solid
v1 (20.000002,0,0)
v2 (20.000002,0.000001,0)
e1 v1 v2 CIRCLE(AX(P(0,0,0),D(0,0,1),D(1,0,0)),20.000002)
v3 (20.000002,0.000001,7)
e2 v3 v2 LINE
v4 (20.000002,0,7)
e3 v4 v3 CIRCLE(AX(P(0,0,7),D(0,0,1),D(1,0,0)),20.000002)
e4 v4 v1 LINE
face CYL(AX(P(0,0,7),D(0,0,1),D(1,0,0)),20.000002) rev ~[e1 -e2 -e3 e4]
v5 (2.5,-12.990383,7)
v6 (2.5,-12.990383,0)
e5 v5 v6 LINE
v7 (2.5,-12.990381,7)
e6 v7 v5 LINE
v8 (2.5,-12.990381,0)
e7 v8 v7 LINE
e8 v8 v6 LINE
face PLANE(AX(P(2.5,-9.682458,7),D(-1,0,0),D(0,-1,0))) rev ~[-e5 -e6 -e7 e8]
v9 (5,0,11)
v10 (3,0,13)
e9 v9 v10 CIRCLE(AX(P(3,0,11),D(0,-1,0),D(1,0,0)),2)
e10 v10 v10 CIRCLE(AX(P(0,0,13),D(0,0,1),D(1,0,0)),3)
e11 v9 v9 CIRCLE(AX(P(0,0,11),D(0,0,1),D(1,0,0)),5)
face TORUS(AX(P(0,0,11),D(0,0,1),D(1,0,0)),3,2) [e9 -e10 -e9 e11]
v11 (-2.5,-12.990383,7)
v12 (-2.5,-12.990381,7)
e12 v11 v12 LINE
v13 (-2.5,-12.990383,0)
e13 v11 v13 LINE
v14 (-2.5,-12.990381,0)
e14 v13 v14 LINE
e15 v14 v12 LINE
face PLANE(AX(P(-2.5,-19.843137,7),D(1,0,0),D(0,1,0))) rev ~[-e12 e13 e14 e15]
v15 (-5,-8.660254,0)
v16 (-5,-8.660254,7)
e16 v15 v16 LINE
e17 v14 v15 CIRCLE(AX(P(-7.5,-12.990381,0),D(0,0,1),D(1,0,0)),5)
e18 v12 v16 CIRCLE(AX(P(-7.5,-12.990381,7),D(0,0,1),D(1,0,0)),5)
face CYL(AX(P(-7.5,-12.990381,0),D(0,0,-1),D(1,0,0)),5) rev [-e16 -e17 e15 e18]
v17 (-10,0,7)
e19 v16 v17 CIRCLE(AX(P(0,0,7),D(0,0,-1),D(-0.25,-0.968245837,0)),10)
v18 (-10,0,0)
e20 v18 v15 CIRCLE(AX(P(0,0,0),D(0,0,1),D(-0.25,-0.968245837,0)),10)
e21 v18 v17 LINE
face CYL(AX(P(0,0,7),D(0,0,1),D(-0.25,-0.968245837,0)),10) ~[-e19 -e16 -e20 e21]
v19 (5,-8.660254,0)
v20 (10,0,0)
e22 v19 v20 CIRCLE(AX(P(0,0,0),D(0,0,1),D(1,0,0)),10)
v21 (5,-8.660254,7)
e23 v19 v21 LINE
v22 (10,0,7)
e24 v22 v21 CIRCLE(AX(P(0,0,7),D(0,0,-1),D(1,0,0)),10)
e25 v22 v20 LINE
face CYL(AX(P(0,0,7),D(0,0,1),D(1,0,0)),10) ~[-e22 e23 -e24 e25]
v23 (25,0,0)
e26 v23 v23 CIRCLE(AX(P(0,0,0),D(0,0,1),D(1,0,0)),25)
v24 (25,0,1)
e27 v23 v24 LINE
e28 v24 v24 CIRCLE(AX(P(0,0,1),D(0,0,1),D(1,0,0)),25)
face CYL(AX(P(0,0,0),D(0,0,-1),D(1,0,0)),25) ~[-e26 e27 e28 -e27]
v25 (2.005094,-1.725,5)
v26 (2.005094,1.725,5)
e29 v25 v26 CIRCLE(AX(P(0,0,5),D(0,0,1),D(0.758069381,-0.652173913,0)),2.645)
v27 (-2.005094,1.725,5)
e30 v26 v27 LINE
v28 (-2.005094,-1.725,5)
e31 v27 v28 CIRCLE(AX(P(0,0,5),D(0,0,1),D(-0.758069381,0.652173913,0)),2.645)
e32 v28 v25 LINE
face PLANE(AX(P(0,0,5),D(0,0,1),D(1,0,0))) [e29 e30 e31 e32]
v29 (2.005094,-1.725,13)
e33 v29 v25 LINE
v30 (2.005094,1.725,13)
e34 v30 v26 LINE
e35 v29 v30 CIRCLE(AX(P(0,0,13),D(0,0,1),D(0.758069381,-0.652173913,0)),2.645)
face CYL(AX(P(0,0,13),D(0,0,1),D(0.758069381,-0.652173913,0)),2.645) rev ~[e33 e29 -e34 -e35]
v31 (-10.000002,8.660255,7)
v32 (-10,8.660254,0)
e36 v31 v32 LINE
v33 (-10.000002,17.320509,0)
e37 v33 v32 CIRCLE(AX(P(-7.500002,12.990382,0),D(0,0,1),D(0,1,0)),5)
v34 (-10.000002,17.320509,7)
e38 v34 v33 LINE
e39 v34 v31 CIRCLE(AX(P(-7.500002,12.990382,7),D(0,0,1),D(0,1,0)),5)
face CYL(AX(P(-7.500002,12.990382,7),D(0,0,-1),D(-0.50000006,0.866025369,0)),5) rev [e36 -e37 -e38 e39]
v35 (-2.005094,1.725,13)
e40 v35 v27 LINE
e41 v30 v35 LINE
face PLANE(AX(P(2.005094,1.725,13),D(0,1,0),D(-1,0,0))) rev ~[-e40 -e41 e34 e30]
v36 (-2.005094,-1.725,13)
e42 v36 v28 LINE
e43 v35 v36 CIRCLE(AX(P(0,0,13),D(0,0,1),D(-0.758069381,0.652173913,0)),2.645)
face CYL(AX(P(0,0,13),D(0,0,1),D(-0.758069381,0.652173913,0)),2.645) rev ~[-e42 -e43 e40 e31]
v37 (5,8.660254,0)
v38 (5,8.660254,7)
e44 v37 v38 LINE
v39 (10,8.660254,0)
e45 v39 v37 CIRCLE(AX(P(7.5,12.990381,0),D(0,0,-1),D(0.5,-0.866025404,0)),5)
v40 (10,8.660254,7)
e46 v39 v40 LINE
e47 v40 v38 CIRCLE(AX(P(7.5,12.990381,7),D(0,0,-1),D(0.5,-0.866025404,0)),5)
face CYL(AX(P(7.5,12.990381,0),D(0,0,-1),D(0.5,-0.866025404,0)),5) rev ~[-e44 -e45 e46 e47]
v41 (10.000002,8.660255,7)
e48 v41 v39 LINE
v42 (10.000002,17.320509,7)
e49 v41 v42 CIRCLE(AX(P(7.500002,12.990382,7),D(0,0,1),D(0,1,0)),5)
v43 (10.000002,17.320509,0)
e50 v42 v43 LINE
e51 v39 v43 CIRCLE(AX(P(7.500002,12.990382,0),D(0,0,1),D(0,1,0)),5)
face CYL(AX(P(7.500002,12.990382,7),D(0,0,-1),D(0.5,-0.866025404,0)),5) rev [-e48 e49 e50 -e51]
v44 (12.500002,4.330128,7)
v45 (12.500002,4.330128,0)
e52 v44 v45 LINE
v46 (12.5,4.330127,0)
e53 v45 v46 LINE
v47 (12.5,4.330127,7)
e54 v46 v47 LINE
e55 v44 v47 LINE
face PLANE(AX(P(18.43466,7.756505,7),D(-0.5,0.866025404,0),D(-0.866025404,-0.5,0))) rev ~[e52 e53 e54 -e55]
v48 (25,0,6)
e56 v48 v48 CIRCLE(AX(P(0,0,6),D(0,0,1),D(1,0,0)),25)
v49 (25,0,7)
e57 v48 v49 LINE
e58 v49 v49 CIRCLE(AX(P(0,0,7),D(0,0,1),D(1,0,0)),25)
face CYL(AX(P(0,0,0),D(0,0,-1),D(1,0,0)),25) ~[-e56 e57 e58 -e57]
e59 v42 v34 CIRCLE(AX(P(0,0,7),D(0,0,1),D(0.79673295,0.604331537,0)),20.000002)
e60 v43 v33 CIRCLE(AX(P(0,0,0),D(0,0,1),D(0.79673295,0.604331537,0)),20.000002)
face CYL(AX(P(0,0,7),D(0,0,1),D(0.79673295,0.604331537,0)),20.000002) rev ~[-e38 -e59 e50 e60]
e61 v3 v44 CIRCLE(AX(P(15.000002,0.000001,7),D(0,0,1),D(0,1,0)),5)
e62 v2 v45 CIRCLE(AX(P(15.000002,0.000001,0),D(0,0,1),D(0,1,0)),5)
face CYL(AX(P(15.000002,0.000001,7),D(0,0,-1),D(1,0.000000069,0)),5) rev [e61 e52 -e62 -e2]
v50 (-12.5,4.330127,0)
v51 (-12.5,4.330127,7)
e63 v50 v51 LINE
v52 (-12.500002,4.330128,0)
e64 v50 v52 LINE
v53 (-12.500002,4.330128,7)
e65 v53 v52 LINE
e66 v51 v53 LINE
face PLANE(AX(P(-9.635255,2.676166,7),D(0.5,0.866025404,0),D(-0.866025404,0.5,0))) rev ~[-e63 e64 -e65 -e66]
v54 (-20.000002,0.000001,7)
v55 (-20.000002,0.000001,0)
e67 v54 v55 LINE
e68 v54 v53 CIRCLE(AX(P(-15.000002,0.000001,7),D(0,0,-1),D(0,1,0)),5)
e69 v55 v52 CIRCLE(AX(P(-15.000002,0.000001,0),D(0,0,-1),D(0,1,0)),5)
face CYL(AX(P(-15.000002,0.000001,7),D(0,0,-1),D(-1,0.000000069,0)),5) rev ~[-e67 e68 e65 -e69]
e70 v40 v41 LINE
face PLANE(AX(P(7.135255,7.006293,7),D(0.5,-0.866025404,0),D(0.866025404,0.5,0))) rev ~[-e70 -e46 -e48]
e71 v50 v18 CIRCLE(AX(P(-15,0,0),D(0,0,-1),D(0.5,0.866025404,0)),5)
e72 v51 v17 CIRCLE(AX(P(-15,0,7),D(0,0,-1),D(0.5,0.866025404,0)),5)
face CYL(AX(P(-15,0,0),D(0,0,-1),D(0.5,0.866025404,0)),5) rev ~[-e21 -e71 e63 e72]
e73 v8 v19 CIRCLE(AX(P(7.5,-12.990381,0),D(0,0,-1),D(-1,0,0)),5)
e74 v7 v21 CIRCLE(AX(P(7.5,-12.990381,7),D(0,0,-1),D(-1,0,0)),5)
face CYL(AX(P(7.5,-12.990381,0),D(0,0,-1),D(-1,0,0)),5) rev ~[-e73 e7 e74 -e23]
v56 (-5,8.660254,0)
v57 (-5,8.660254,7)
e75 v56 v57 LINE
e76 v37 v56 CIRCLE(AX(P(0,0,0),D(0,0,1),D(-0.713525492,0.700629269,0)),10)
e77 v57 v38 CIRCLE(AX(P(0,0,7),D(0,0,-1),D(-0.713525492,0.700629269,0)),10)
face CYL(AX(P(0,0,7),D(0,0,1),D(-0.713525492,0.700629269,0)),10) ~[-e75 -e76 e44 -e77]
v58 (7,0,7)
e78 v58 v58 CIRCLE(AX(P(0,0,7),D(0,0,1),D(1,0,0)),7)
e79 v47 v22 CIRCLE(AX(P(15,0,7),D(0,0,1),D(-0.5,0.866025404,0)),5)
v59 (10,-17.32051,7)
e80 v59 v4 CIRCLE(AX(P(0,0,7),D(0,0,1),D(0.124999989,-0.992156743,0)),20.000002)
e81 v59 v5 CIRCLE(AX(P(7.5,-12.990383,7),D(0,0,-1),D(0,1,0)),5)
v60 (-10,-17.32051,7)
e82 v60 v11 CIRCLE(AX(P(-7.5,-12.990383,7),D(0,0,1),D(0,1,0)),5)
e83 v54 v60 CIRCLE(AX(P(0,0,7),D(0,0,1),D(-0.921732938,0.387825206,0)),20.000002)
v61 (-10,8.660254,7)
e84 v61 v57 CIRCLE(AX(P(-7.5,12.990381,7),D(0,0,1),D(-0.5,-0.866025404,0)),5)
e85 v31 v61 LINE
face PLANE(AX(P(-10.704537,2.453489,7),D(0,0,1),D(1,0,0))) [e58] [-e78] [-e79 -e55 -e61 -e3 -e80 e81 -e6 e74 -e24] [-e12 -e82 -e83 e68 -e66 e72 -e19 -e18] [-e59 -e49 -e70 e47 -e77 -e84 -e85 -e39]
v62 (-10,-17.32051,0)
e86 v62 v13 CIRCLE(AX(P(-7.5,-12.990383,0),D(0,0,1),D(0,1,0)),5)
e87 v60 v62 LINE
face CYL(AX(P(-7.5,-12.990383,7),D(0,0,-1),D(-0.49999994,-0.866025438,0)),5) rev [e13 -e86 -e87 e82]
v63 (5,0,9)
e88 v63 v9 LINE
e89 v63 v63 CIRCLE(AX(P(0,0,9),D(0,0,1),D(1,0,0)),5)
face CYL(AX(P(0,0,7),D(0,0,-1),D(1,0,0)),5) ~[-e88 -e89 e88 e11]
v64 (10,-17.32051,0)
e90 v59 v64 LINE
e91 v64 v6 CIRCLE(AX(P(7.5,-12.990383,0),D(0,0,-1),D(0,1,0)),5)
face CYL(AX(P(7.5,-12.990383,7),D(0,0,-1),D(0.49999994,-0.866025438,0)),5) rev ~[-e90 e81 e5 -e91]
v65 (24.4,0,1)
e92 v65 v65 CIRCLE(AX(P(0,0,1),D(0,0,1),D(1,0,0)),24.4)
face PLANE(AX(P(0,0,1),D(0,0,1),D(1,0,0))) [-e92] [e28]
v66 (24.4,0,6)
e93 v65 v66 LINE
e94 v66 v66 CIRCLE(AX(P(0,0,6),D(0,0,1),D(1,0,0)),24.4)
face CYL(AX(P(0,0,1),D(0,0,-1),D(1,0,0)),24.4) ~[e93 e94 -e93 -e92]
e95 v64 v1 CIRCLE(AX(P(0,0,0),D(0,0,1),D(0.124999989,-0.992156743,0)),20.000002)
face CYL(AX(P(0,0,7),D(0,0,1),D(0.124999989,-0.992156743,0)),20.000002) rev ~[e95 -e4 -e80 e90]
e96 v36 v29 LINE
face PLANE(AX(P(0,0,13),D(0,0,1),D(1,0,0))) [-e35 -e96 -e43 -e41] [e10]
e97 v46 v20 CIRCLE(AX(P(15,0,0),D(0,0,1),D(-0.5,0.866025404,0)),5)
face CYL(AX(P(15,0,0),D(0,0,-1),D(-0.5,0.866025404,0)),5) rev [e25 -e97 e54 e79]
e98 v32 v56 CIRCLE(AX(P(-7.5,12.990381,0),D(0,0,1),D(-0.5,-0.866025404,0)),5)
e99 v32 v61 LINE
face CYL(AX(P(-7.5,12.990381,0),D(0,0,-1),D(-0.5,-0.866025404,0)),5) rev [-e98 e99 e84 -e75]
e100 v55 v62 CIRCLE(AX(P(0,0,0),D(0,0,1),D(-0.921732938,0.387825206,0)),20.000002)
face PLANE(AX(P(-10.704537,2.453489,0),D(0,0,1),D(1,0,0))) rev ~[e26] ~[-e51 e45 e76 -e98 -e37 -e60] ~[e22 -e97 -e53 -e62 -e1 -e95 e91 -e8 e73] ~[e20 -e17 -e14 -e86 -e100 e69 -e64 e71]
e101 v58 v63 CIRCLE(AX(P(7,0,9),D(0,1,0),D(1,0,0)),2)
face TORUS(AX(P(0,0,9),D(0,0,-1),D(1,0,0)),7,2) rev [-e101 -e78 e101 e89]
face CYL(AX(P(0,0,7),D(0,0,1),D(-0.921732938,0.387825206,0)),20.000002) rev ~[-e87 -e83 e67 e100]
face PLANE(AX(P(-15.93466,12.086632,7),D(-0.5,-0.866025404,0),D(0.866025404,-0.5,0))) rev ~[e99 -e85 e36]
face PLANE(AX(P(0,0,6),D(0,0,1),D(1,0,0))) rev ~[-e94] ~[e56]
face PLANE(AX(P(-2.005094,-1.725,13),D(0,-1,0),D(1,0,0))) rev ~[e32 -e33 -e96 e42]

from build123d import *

# Parameters (mm, degrees)
F0_R         = 25
F1_DEPTH     = 7
F2_R         = 5
F3_DEPTH     = 6
F5_DEPTH     = 8
F7_R         = 25
F7_R_2       = 24.4
F8_DEPTH     = 5
F10_DEPTH    = 25
F11_R        = 5
F12_T1_DEPTH = 7
F13_R        = 2


# Not quite as in the source:
# - a fillet or chamfer that OpenCascade refuses, or shapes differently, is made with other operations: its cross-section is extruded or revolved along the edge and cut away or added


with BuildPart() as f1:
    # F0 (on Top) → F1 (new body)
    with BuildSketch(Plane.XY):
        Circle(F0_R)
    extrude(amount=F1_DEPTH)

    # F2 (on face) → F3 (join)
    with BuildSketch(Plane.XY.offset(7)):
        Circle(F2_R)
    extrude(amount=F3_DEPTH)

    # F4 (on face) → F5 (cut)
    with BuildSketch(Plane.XY.offset(13)):
        with BuildLine():
            Line((2.005093514, 1.725), (-2.005093514, 1.725))
            ThreePointArc((-2.005093514, 1.725), (-2.645, 0), (-2.005093514, -1.725))
            Line((-2.005093514, -1.725), (2.005093514, -1.725))
            ThreePointArc((2.005093514, -1.725), (2.645, 0), (2.005093514, 1.725))
        make_face()
    extrude(amount=-F5_DEPTH, mode=Mode.SUBTRACT)

    # F7 (on offset) → F8 (cut)
    with BuildSketch(Plane.XY.offset(1)):
        Circle(F7_R)
        Circle(F7_R_2, mode=Mode.SUBTRACT)
    extrude(amount=F8_DEPTH, mode=Mode.SUBTRACT)

    # F9 (on face) → F10 (cut)
    with BuildSketch(Plane.XY.offset(7)):
        with BuildLine():
            Line((7.1352549156, 7.0062926922), (15.9346604169, 12.0866318271))
            ThreePointArc((15.9346604169, 12.0866318271), (0, 20.0000017881), (-15.9346604169, 12.0866318271))
            Line((-15.9346604169, 12.0866318271), (-7.1352549156, 7.0062926922))
            ThreePointArc((-7.1352549156, 7.0062926922), (0, 10), (7.1352549156, 7.0062926922))
        make_face()
        with BuildLine():
            ThreePointArc((2.5, -19.8431366353), (15.0000012666, -13.2287578225), (20.0000017881, 0))
            ThreePointArc((20.0000017881, 0), (19.6047610649, 3.9564397015), (18.4346604169, 7.7565048082))
            Line((18.4346604169, 7.7565048082), (9.6352549156, 2.6761656733))
            ThreePointArc((9.6352549156, 2.6761656733), (9.9083941473, 1.3504537837), (10, 0))
            ThreePointArc((10, 0), (7.9056941504, -6.123724357), (2.5, -9.6824583655))
            Line((2.5, -9.6824583655), (2.5, -19.8431366353))
        make_face()
        with BuildLine():
            ThreePointArc((-18.4346604169, 7.7565048082), (-17.3205096243, -10.0000008941), (-2.5, -19.8431366353))
            Line((-2.5, -19.8431366353), (-2.5, -9.6824583655))
            ThreePointArc((-2.5, -9.6824583655), (-8.6602540378, -5), (-9.6352549156, 2.6761656733))
            Line((-9.6352549156, 2.6761656733), (-18.4346604169, 7.7565048082))
        make_face()
    extrude(amount=-F10_DEPTH, mode=Mode.SUBTRACT)

    # F11
    f11_edges = [f1.edges().sort_by_distance(p)[0] for p in [
        (-18.43466, 7.756505, 3.5),
        (-15.93466, 12.086632, 3.5),
        (15.93466, 12.086632, 3.5),
        (18.43466, 7.756505, 3.5),
        (2.5, -19.843137, 3.5),
        (-2.5, -19.843137, 3.5),
    ]]
    fillet(f11_edges, radius=F11_R)

    # F12: fillet of radius 5 on 6 edges, made by hand

    # F12_s2 → F12_t1 (join)
    with BuildSketch(Plane.XY):
        with BuildLine():
            ThreePointArc((-12.5, 4.3301270189), (-10.6698729811, 2.5), (-10, 0))
            ThreePointArc((-10, 0), (-9.9083941473, 1.3504537837), (-9.6352549156, 2.6761656733))
            Line((-9.6352549156, 2.6761656733), (-12.5, 4.3301270189))
        make_face()
        with BuildLine():
            ThreePointArc((-2.5, -12.9903810568), (-3.1698729811, -10.4903810568), (-5, -8.6602540378))
            ThreePointArc((-5, -8.6602540378), (-3.7846697903, -9.2561479341), (-2.5, -9.6824583655))
            Line((-2.5, -9.6824583655), (-2.5, -12.9903810568))
        make_face()
        with BuildLine():
            ThreePointArc((2.5, -12.9903810568), (3.1698729811, -10.4903810568), (5, -8.6602540378))
            ThreePointArc((5, -8.6602540378), (3.7846697903, -9.2561479341), (2.5, -9.6824583655))
            Line((2.5, -9.6824583655), (2.5, -12.9903810568))
        make_face()
        with BuildLine():
            ThreePointArc((12.5, 4.3301270189), (10.6698729811, 2.5), (10, 0))
            ThreePointArc((10, 0), (9.9083941473, 1.3504537837), (9.6352549156, 2.6761656733))
            Line((9.6352549156, 2.6761656733), (12.5, 4.3301270189))
        make_face()
        with BuildLine():
            ThreePointArc((10, 8.6602540378), (7.5, 7.9903810568), (5, 8.6602540378))
            ThreePointArc((5, 8.6602540378), (6.123724357, 7.9056941504), (7.1352549156, 7.0062926922))
            Line((7.1352549156, 7.0062926922), (10, 8.6602540378))
        make_face()
        with BuildLine():
            ThreePointArc((-10, 8.6602540378), (-7.5, 7.9903810568), (-5, 8.6602540378))
            ThreePointArc((-5, 8.6602540378), (-6.123724357, 7.9056941504), (-7.1352549156, 7.0062926922))
            Line((-7.1352549156, 7.0062926922), (-10, 8.6602540378))
        make_face()
    extrude(amount=F12_T1_DEPTH)

    # F13
    f13_edges = [f1.edges().sort_by_distance(p)[0] for p in [
        (-5, 0, 7),
        (-5, 0, 13),
    ]]
    fillet(f13_edges, radius=F13_R)


solid = f1.part
